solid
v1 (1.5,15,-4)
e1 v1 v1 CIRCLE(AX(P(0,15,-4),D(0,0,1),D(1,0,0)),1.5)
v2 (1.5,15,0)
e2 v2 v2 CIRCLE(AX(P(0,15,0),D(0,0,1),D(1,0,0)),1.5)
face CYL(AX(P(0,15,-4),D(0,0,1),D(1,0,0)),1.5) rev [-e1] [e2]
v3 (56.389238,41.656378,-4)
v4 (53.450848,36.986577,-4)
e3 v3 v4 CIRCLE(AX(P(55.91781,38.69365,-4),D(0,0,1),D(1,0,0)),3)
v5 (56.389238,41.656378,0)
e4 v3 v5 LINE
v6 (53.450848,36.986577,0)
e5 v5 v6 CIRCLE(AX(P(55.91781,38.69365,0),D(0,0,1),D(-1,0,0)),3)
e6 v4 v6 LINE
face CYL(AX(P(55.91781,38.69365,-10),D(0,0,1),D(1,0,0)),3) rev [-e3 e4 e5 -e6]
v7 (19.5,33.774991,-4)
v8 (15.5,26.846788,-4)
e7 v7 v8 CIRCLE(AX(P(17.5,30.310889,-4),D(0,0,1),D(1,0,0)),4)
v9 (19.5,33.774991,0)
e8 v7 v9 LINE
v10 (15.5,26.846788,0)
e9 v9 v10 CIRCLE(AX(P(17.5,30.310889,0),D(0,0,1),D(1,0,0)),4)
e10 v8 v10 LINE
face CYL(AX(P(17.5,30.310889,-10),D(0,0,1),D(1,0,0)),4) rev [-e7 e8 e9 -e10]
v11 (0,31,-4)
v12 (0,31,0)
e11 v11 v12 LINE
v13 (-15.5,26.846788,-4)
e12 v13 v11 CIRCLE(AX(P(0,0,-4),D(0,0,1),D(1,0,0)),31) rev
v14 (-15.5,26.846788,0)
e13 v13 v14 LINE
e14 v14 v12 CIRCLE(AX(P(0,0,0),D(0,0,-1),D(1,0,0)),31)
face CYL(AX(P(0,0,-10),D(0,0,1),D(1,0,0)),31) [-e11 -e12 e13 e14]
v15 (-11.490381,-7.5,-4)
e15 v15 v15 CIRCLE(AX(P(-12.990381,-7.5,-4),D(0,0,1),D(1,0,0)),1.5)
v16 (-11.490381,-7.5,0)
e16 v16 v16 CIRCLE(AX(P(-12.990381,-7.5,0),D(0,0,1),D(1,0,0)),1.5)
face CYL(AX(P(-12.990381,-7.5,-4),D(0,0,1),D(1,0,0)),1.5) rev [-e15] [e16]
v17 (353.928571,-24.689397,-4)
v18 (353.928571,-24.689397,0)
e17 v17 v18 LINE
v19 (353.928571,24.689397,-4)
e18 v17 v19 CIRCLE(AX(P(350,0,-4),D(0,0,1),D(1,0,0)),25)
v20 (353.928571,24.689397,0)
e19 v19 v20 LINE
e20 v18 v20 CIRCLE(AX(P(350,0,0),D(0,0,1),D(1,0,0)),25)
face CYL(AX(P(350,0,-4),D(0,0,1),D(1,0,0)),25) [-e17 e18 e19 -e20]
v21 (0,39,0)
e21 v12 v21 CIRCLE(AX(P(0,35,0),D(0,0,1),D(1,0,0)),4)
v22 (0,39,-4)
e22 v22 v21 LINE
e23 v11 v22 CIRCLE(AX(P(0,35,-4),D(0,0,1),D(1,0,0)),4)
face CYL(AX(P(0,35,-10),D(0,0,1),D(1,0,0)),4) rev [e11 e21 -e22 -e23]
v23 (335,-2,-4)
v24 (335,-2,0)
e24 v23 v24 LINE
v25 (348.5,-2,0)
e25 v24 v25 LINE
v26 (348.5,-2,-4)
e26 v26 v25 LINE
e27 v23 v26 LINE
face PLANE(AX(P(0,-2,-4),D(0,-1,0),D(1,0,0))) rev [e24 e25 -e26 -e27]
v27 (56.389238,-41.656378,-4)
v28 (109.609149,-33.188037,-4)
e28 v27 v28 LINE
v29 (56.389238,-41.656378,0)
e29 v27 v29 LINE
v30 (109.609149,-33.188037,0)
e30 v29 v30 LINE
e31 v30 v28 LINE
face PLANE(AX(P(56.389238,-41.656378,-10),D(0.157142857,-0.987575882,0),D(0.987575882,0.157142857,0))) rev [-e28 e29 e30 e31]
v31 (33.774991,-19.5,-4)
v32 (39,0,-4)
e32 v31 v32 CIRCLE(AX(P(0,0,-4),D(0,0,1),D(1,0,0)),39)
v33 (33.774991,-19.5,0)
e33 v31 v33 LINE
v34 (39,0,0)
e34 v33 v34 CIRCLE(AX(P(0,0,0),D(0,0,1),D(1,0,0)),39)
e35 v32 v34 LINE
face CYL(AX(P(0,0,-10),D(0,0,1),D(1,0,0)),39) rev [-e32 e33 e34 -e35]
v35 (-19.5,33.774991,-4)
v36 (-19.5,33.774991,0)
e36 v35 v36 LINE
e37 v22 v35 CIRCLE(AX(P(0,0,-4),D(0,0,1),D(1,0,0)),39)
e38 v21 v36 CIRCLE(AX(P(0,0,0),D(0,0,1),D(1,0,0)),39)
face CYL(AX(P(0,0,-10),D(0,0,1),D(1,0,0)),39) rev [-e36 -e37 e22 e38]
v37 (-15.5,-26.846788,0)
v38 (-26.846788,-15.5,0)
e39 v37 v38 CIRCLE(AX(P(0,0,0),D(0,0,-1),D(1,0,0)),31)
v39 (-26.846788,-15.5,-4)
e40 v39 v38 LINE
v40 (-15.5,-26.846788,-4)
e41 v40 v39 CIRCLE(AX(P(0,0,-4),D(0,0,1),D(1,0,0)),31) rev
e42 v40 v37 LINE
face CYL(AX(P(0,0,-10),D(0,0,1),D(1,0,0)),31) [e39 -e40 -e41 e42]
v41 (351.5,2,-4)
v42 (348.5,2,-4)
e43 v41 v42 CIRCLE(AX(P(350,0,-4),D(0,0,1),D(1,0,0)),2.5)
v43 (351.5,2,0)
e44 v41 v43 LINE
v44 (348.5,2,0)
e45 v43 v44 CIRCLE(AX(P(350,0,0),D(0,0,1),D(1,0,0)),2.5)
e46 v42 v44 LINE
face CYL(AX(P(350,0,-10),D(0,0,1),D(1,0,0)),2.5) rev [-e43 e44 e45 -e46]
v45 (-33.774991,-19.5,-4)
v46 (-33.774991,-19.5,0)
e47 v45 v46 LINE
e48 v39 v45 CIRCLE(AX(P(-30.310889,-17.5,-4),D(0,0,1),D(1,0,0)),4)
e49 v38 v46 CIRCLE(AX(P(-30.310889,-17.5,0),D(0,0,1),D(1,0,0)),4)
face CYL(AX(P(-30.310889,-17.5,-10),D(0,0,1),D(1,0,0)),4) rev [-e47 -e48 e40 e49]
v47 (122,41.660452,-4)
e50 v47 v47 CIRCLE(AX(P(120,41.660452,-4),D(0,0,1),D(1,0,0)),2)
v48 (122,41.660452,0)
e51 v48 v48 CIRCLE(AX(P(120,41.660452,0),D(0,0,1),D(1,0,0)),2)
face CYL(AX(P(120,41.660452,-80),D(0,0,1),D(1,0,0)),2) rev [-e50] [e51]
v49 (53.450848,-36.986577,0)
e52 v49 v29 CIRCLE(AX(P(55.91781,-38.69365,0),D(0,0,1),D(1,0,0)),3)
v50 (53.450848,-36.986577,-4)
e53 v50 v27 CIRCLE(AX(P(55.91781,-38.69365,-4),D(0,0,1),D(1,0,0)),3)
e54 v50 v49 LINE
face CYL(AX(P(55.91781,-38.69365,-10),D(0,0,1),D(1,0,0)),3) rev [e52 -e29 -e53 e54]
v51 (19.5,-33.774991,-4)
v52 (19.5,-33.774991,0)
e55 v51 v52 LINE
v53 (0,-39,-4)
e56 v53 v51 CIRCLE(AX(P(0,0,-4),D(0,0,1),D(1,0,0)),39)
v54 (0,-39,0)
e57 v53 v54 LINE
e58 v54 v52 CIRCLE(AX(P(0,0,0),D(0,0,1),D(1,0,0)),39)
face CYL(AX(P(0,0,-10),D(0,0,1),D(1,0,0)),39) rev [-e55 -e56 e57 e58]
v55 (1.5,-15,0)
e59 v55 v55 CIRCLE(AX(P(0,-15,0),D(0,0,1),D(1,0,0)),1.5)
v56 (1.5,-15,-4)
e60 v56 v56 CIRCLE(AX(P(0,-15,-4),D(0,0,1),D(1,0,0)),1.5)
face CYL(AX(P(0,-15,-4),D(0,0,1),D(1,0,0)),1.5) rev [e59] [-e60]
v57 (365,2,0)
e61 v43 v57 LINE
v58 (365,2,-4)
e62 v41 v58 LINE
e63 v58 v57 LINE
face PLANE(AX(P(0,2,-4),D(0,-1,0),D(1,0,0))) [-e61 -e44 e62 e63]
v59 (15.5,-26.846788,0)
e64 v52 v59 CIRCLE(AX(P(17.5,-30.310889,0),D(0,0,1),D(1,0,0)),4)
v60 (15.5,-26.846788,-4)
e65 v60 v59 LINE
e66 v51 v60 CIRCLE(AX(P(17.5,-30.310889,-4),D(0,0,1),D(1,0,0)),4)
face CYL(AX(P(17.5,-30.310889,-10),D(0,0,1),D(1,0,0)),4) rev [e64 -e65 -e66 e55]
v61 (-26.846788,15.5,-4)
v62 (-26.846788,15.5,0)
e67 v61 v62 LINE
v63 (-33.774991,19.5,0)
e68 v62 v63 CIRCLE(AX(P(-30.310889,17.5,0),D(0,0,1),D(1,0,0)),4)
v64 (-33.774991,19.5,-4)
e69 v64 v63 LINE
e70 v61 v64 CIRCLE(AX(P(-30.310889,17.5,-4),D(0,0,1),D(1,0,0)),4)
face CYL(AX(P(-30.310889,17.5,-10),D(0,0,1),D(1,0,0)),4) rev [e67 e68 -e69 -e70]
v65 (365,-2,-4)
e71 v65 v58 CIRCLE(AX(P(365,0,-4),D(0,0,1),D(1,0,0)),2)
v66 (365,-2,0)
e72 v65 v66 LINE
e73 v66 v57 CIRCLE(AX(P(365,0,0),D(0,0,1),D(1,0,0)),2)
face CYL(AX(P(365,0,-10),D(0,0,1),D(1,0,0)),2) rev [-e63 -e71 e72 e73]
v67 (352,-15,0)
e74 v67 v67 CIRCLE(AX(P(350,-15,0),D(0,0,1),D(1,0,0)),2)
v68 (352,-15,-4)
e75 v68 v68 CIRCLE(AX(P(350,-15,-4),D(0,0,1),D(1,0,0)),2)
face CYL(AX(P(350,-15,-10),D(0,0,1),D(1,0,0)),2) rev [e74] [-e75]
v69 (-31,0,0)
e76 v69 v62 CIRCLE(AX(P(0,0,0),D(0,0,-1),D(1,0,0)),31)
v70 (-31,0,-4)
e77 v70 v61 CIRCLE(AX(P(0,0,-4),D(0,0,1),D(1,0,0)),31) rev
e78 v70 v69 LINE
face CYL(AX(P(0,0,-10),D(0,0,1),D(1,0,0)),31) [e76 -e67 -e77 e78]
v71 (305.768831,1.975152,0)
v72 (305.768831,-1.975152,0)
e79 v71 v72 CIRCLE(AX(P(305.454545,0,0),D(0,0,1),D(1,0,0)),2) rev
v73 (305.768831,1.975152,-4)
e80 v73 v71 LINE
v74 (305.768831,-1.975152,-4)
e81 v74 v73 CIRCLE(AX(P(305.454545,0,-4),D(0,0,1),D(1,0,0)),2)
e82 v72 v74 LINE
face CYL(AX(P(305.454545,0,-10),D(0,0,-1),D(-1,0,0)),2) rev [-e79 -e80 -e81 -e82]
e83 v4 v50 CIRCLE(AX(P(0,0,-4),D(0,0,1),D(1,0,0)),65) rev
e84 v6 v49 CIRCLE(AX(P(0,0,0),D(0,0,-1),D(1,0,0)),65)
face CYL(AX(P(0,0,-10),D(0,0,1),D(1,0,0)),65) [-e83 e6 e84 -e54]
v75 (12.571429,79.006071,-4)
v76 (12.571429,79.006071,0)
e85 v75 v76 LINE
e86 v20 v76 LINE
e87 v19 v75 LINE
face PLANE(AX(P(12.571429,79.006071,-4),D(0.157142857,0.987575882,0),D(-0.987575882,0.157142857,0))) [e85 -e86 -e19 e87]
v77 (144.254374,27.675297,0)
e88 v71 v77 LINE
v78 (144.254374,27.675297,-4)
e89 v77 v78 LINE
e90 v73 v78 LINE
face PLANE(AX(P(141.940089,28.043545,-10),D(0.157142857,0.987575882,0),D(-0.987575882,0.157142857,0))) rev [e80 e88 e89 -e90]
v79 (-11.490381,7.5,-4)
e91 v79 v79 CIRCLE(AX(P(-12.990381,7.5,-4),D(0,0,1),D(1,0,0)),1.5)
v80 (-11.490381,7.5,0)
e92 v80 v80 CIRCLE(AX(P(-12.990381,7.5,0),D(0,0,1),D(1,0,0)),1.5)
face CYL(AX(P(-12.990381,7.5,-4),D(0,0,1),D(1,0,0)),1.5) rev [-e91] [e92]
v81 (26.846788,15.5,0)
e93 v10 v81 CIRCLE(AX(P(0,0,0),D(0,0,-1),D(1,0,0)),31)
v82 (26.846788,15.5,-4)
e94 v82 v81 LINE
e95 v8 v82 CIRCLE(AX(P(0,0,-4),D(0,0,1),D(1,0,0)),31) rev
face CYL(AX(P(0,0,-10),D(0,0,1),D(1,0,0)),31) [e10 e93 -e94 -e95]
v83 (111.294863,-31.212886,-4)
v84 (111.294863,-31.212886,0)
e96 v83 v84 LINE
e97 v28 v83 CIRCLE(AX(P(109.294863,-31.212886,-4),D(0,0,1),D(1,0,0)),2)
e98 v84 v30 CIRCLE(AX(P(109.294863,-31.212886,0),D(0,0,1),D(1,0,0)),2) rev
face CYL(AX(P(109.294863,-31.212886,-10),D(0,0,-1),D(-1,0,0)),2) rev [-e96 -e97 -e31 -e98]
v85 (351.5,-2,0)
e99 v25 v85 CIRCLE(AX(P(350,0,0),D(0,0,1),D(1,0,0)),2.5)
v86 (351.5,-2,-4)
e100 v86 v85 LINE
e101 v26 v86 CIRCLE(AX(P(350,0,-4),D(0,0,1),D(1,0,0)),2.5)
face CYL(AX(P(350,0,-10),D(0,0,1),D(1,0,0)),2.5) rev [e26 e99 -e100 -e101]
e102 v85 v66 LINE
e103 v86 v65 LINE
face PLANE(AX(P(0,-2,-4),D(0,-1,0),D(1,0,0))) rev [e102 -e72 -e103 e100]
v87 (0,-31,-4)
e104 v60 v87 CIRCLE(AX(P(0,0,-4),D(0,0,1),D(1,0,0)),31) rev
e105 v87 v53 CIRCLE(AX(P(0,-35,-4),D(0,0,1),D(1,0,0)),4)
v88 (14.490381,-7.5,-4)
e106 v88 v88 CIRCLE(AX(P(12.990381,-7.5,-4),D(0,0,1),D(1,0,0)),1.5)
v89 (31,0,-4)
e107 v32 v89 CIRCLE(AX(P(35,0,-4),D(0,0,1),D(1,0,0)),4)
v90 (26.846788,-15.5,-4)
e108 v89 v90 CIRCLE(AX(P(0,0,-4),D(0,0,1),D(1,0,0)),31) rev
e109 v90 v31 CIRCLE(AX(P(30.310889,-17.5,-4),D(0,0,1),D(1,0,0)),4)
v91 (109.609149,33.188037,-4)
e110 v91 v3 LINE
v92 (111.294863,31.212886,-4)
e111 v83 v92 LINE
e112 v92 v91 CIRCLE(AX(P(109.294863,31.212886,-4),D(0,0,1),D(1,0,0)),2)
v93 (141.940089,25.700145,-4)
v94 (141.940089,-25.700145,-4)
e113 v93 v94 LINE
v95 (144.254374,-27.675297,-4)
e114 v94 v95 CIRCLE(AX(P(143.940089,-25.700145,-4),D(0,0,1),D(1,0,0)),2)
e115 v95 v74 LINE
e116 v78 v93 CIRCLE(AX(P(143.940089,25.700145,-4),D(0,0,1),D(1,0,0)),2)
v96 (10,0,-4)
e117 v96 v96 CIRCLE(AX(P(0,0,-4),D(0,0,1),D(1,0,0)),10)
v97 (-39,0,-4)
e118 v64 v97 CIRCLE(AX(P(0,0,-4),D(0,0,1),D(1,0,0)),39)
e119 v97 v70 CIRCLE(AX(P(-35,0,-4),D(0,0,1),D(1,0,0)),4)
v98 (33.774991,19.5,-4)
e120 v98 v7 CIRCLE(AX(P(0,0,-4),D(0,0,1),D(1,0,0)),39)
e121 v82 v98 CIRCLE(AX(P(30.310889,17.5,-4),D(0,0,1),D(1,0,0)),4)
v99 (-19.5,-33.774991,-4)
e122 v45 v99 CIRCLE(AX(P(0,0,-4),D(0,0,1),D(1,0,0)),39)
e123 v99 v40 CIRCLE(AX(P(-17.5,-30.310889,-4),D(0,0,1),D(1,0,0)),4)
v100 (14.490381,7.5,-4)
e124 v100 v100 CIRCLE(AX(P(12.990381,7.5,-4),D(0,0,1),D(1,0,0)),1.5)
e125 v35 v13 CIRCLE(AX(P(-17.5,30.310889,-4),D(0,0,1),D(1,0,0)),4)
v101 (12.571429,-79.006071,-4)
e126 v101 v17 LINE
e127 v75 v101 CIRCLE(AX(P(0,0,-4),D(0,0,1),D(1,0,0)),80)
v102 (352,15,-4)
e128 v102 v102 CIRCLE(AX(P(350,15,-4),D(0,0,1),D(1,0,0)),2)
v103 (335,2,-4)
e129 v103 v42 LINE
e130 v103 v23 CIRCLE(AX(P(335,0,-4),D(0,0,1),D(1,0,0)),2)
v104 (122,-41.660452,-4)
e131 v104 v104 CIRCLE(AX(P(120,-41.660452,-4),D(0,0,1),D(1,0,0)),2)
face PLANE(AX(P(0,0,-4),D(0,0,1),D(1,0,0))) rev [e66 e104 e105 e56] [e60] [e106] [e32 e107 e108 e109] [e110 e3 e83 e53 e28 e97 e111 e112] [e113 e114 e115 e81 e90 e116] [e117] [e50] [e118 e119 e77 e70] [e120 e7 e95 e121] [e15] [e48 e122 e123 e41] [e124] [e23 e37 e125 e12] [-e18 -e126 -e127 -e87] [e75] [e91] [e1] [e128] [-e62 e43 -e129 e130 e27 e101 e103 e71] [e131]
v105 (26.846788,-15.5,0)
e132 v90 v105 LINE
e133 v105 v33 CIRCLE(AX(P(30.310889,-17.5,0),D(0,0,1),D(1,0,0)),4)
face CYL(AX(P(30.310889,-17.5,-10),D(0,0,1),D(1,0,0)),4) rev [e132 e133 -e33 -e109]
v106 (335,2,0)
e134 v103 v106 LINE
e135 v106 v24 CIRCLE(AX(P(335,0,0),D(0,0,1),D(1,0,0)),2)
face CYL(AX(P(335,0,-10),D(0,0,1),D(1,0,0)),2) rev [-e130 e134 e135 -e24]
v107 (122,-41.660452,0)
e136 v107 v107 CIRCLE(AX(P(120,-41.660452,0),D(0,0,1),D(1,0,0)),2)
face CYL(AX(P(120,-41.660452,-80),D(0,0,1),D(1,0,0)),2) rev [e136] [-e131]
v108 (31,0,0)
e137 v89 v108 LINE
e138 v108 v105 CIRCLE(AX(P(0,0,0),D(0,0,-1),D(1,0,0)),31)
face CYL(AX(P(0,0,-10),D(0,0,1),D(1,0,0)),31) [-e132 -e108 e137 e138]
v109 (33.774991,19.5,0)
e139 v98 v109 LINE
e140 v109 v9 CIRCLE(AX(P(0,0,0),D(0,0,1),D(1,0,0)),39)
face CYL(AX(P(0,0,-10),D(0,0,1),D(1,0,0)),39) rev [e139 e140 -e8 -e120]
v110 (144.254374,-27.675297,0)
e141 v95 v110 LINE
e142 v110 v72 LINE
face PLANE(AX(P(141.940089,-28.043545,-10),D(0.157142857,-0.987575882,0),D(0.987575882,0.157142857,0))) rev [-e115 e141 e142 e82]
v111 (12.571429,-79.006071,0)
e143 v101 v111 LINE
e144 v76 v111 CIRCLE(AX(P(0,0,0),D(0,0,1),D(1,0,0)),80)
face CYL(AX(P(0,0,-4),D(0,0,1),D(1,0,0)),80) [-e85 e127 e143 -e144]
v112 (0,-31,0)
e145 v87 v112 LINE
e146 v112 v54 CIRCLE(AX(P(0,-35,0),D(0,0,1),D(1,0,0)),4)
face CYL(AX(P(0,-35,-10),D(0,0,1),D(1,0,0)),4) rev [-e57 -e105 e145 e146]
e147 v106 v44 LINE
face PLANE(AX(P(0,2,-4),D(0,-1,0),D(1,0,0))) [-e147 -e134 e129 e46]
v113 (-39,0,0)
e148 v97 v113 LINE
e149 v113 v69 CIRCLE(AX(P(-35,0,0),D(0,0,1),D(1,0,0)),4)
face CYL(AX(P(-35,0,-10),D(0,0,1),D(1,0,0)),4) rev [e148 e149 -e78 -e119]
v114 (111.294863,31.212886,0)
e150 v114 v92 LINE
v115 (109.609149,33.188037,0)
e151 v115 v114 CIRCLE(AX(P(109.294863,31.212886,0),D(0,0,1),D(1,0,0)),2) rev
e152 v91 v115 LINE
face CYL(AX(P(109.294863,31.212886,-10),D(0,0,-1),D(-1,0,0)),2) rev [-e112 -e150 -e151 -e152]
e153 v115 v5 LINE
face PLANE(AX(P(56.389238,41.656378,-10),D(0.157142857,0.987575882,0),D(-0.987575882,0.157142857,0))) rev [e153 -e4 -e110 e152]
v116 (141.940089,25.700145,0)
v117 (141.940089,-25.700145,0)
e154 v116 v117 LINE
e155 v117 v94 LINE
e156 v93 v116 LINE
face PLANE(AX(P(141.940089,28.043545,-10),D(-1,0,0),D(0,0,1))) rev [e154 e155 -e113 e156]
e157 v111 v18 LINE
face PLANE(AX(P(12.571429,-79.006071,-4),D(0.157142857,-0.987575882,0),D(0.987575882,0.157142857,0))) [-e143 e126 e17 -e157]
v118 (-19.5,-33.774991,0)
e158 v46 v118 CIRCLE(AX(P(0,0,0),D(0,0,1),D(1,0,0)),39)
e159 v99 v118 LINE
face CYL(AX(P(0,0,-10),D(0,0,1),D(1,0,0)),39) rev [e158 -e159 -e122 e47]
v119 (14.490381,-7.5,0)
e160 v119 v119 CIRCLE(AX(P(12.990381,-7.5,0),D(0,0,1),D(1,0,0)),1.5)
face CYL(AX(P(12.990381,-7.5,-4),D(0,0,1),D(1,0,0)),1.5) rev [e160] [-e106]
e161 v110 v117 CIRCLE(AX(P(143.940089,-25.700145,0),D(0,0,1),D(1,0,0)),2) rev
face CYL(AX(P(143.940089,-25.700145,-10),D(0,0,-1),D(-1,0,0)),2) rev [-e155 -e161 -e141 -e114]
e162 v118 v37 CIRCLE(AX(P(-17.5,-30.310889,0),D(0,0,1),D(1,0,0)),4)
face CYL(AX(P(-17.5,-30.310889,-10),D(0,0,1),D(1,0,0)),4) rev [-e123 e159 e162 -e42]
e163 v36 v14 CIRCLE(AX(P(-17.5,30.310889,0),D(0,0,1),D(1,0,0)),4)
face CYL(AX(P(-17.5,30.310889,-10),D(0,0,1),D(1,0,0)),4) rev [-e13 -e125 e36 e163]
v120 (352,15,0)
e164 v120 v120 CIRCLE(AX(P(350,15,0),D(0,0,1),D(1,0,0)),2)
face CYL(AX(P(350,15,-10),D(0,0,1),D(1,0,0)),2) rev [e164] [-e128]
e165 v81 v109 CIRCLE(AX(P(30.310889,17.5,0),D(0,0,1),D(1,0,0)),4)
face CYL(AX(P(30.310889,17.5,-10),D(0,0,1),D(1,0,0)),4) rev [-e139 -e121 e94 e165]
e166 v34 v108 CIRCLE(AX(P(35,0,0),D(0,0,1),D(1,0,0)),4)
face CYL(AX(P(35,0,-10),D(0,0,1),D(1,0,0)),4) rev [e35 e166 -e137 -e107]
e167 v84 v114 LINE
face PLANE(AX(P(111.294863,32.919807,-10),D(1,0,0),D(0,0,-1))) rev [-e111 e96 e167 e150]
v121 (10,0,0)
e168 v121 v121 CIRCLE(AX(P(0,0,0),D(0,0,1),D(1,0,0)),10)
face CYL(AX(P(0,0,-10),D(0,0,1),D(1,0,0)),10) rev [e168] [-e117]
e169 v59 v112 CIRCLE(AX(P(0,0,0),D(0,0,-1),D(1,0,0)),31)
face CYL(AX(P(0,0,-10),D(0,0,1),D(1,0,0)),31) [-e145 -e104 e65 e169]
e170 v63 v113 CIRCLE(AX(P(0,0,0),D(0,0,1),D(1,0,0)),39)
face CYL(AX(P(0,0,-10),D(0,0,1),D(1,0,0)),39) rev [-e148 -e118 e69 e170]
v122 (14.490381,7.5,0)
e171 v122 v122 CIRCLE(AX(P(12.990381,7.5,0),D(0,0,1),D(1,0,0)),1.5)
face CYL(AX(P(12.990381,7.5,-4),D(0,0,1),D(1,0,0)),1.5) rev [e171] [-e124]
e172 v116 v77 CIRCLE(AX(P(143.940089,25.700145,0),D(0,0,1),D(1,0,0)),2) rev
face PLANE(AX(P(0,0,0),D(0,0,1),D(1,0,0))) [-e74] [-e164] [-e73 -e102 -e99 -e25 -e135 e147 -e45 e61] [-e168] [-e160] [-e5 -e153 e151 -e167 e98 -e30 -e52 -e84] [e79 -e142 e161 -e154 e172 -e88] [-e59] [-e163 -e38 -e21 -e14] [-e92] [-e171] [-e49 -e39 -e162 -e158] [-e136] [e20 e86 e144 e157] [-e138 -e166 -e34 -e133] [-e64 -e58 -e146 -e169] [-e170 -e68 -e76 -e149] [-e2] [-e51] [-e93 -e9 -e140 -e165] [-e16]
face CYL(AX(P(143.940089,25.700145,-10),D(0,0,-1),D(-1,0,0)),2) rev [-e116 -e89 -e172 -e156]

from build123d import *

# Parameters (mm, degrees)
SM_BASE_FLANGE_1_DEPTH = 4
SKETCH_6_R             = 10
SKETCH_6_R_2           = 2.5
CUT_EXTRUDE_1_DEPTH    = 10
SKETCH_7_R             = 2
CUT_EXTRUDE_2_DEPTH    = 10
CUT_EXTRUDE_3_DEPTH    = 10
SKETCH_9_R             = 2
CUT_EXTRUDE_4_DEPTH    = 80
FILLET_2_R             = 2
SKETCH_10_R            = 1.5
CUT_EXTRUDE_5_DEPTH    = 4


# Sheet-metal steps are written as plain solids
with BuildPart() as part:
    # Sketch 1 → 基体-法兰1 (new body)
    with BuildSketch(Plane.XY):
        with BuildLine():
            Line((12.571428571, 79.00607055), (353.928571429, 24.689397047))
            ThreePointArc((353.928571429, 24.689397047), (375, 0), (353.928571429, -24.689397047))
            Line((353.928571429, -24.689397047), (12.571428571, -79.00607055))
            ThreePointArc((12.571428571, -79.00607055), (-80, 0), (12.571428571, 79.00607055))
        make_face()
    extrude(amount=-SM_BASE_FLANGE_1_DEPTH)

    # 草图6 → 切除-拉伸1 (cut)
    with BuildSketch(Plane.XY):
        Circle(SKETCH_6_R)
        with Locations((350, 0)):
            Circle(SKETCH_6_R_2)
    extrude(amount=-CUT_EXTRUDE_1_DEPTH, mode=Mode.SUBTRACT)

    # 草图7 → 切除-拉伸2 (cut)
    with BuildSketch(Plane.XY):
        with Locations((365, 0)):
            Circle(SKETCH_7_R)
        with Locations((350, -15)):
            Circle(SKETCH_7_R)
        with Locations((335, 0)):
            Circle(SKETCH_7_R)
        with Locations((350, 15)):
            Circle(SKETCH_7_R)
        with BuildLine():
            Line((111.294862901, 32.919806827), (111.294862901, -32.919806827))
            Line((111.294862901, -32.919806827), (56.389238276, -41.656377743))
            ThreePointArc((56.389238276, -41.656377743), (53.378656764, -40.291367953), (53.450847511, -36.986577299))
            ThreePointArc((53.450847511, -36.986577299), (62.032293151, -19.416348946), (64.999939097, -0.088979461))
            ThreePointArc((64.999939097, -0.088979461), (62.058814357, 19.33141383), (53.450847511, 36.986577299))
            ThreePointArc((53.450847511, 36.986577299), (53.378656764, 40.291367953), (56.389238276, 41.656377743))
            Line((56.389238276, 41.656377743), (111.294862901, 32.919806827))
        make_face()
        Polygon((141.940088648, 28.043545246), (141.940088648, -28.043545246), (318.181818182, 0), align=None)
        with BuildLine():
            ThreePointArc((0, 39), (-10.093942759, 37.671107225), (-19.5, 33.774990748))
            ThreePointArc((-19.5, 33.774990748), (-20.964101615, 28.310889132), (-15.5, 26.846787517))
            ThreePointArc((-15.5, 26.846787517), (-8.023390398, 29.943700615), (0, 31))
            ThreePointArc((0, 31), (4, 35), (0, 39))
        make_face()
        with BuildLine():
            ThreePointArc((26.846787517, 15.5), (21.920310217, 21.920310217), (15.5, 26.846787517))
            ThreePointArc((15.5, 26.846787517), (14.035898385, 32.310889132), (19.5, 33.774990748))
            ThreePointArc((19.5, 33.774990748), (27.577164466, 27.577164466), (33.774990748, 19.5))
            ThreePointArc((33.774990748, 19.5), (32.310889132, 14.035898385), (26.846787517, 15.5))
        make_face()
        with BuildLine():
            ThreePointArc((26.846787517, -15.5), (29.943700615, -8.023390398), (31, 0))
            ThreePointArc((31, 0), (35, 4), (39, 0))
            ThreePointArc((39, 0), (37.671107225, -10.093942759), (33.774990748, -19.5))
            ThreePointArc((33.774990748, -19.5), (28.310889132, -20.964101615), (26.846787517, -15.5))
        make_face()
        with BuildLine():
            ThreePointArc((0, -31), (8.023390398, -29.943700615), (15.5, -26.846787517))
            ThreePointArc((15.5, -26.846787517), (20.964101615, -28.310889132), (19.5, -33.774990748))
            ThreePointArc((19.5, -33.774990748), (10.093942759, -37.671107225), (0, -39))
            ThreePointArc((0, -39), (-4, -35), (0, -31))
        make_face()
        with BuildLine():
            ThreePointArc((-26.846787517, -15.5), (-21.920310217, -21.920310217), (-15.5, -26.846787517))
            ThreePointArc((-15.5, -26.846787517), (-14.035898385, -32.310889132), (-19.5, -33.774990748))
            ThreePointArc((-19.5, -33.774990748), (-27.577164466, -27.577164466), (-33.774990748, -19.5))
            ThreePointArc((-33.774990748, -19.5), (-32.310889132, -14.035898385), (-26.846787517, -15.5))
        make_face()
        with BuildLine():
            ThreePointArc((-26.846787517, 15.5), (-29.943700615, 8.023390398), (-31, 0))
            ThreePointArc((-31, 0), (-35, -4), (-39, 0))
            ThreePointArc((-39, 0), (-37.671107225, 10.093942759), (-33.774990748, 19.5))
            ThreePointArc((-33.774990748, 19.5), (-28.310889132, 20.964101615), (-26.846787517, 15.5))
        make_face()
    extrude(amount=-CUT_EXTRUDE_2_DEPTH, mode=Mode.SUBTRACT)

    # 草图8 → 切除-拉伸3 (cut)
    with BuildSketch(Plane.XY):
        with BuildLine():
            Line((347.5, 0), (337, 0))
            ThreePointArc((337, 0), (336.414213562, -1.414213562), (335, -2))
            Line((335, -2), (348.5, -2))
            ThreePointArc((348.5, -2), (347.763932023, -1.118033989), (347.5, 0))
        make_face()
        with BuildLine():
            ThreePointArc((335, 2), (336.414213562, 1.414213562), (337, 0))
            Line((337, 0), (347.5, 0))
            ThreePointArc((347.5, 0), (347.763932023, 1.118033989), (348.5, 2))
            Line((348.5, 2), (335, 2))
        make_face()
        with BuildLine():
            ThreePointArc((351.5, 2), (352.236067977, 1.118033989), (352.5, 0))
            Line((352.5, 0), (363, 0))
            ThreePointArc((363, 0), (363.585786438, 1.414213562), (365, 2))
            Line((365, 2), (351.5, 2))
        make_face()
        with BuildLine():
            Line((363, 0), (352.5, 0))
            ThreePointArc((352.5, 0), (352.236067977, -1.118033989), (351.5, -2))
            Line((351.5, -2), (365, -2))
            ThreePointArc((365, -2), (363.585786438, -1.414213562), (363, 0))
        make_face()
    extrude(amount=-CUT_EXTRUDE_3_DEPTH, mode=Mode.SUBTRACT)

    # 草图9 → 切除-拉伸4 (cut)
    with BuildSketch(Plane.XY):
        with Locations((120, 41.660451514)):
            Circle(SKETCH_9_R)
        with Locations((120, -41.660451514)):
            Circle(SKETCH_9_R)
    extrude(amount=-CUT_EXTRUDE_4_DEPTH, mode=Mode.SUBTRACT)

    # 圆角2
    fillet_2_edges = [part.edges().sort_by_distance(p)[0] for p in [
        (111.294862901, 32.919806827, -2),
        (111.294862901, -32.919806827, -2),
        (141.940088648, 28.043545246, -2),
        (318.181818182, 0, -2),
        (141.940088648, -28.043545246, -2),
    ]]
    fillet(fillet_2_edges, radius=FILLET_2_R)

    # 草图10 → 切除-拉伸5 (cut)
    with BuildSketch(Plane.XY):
        with Locations((0, 15)):
            Circle(SKETCH_10_R)
        with Locations((12.990381057, 7.5)):
            Circle(SKETCH_10_R)
        with Locations((12.990381057, -7.5)):
            Circle(SKETCH_10_R)
        with Locations((0, -15)):
            Circle(SKETCH_10_R)
        with Locations((-12.990381057, -7.5)):
            Circle(SKETCH_10_R)
        with Locations((-12.990381057, 7.5)):
            Circle(SKETCH_10_R)
    extrude(amount=-CUT_EXTRUDE_5_DEPTH, mode=Mode.SUBTRACT)


solid = part.part
